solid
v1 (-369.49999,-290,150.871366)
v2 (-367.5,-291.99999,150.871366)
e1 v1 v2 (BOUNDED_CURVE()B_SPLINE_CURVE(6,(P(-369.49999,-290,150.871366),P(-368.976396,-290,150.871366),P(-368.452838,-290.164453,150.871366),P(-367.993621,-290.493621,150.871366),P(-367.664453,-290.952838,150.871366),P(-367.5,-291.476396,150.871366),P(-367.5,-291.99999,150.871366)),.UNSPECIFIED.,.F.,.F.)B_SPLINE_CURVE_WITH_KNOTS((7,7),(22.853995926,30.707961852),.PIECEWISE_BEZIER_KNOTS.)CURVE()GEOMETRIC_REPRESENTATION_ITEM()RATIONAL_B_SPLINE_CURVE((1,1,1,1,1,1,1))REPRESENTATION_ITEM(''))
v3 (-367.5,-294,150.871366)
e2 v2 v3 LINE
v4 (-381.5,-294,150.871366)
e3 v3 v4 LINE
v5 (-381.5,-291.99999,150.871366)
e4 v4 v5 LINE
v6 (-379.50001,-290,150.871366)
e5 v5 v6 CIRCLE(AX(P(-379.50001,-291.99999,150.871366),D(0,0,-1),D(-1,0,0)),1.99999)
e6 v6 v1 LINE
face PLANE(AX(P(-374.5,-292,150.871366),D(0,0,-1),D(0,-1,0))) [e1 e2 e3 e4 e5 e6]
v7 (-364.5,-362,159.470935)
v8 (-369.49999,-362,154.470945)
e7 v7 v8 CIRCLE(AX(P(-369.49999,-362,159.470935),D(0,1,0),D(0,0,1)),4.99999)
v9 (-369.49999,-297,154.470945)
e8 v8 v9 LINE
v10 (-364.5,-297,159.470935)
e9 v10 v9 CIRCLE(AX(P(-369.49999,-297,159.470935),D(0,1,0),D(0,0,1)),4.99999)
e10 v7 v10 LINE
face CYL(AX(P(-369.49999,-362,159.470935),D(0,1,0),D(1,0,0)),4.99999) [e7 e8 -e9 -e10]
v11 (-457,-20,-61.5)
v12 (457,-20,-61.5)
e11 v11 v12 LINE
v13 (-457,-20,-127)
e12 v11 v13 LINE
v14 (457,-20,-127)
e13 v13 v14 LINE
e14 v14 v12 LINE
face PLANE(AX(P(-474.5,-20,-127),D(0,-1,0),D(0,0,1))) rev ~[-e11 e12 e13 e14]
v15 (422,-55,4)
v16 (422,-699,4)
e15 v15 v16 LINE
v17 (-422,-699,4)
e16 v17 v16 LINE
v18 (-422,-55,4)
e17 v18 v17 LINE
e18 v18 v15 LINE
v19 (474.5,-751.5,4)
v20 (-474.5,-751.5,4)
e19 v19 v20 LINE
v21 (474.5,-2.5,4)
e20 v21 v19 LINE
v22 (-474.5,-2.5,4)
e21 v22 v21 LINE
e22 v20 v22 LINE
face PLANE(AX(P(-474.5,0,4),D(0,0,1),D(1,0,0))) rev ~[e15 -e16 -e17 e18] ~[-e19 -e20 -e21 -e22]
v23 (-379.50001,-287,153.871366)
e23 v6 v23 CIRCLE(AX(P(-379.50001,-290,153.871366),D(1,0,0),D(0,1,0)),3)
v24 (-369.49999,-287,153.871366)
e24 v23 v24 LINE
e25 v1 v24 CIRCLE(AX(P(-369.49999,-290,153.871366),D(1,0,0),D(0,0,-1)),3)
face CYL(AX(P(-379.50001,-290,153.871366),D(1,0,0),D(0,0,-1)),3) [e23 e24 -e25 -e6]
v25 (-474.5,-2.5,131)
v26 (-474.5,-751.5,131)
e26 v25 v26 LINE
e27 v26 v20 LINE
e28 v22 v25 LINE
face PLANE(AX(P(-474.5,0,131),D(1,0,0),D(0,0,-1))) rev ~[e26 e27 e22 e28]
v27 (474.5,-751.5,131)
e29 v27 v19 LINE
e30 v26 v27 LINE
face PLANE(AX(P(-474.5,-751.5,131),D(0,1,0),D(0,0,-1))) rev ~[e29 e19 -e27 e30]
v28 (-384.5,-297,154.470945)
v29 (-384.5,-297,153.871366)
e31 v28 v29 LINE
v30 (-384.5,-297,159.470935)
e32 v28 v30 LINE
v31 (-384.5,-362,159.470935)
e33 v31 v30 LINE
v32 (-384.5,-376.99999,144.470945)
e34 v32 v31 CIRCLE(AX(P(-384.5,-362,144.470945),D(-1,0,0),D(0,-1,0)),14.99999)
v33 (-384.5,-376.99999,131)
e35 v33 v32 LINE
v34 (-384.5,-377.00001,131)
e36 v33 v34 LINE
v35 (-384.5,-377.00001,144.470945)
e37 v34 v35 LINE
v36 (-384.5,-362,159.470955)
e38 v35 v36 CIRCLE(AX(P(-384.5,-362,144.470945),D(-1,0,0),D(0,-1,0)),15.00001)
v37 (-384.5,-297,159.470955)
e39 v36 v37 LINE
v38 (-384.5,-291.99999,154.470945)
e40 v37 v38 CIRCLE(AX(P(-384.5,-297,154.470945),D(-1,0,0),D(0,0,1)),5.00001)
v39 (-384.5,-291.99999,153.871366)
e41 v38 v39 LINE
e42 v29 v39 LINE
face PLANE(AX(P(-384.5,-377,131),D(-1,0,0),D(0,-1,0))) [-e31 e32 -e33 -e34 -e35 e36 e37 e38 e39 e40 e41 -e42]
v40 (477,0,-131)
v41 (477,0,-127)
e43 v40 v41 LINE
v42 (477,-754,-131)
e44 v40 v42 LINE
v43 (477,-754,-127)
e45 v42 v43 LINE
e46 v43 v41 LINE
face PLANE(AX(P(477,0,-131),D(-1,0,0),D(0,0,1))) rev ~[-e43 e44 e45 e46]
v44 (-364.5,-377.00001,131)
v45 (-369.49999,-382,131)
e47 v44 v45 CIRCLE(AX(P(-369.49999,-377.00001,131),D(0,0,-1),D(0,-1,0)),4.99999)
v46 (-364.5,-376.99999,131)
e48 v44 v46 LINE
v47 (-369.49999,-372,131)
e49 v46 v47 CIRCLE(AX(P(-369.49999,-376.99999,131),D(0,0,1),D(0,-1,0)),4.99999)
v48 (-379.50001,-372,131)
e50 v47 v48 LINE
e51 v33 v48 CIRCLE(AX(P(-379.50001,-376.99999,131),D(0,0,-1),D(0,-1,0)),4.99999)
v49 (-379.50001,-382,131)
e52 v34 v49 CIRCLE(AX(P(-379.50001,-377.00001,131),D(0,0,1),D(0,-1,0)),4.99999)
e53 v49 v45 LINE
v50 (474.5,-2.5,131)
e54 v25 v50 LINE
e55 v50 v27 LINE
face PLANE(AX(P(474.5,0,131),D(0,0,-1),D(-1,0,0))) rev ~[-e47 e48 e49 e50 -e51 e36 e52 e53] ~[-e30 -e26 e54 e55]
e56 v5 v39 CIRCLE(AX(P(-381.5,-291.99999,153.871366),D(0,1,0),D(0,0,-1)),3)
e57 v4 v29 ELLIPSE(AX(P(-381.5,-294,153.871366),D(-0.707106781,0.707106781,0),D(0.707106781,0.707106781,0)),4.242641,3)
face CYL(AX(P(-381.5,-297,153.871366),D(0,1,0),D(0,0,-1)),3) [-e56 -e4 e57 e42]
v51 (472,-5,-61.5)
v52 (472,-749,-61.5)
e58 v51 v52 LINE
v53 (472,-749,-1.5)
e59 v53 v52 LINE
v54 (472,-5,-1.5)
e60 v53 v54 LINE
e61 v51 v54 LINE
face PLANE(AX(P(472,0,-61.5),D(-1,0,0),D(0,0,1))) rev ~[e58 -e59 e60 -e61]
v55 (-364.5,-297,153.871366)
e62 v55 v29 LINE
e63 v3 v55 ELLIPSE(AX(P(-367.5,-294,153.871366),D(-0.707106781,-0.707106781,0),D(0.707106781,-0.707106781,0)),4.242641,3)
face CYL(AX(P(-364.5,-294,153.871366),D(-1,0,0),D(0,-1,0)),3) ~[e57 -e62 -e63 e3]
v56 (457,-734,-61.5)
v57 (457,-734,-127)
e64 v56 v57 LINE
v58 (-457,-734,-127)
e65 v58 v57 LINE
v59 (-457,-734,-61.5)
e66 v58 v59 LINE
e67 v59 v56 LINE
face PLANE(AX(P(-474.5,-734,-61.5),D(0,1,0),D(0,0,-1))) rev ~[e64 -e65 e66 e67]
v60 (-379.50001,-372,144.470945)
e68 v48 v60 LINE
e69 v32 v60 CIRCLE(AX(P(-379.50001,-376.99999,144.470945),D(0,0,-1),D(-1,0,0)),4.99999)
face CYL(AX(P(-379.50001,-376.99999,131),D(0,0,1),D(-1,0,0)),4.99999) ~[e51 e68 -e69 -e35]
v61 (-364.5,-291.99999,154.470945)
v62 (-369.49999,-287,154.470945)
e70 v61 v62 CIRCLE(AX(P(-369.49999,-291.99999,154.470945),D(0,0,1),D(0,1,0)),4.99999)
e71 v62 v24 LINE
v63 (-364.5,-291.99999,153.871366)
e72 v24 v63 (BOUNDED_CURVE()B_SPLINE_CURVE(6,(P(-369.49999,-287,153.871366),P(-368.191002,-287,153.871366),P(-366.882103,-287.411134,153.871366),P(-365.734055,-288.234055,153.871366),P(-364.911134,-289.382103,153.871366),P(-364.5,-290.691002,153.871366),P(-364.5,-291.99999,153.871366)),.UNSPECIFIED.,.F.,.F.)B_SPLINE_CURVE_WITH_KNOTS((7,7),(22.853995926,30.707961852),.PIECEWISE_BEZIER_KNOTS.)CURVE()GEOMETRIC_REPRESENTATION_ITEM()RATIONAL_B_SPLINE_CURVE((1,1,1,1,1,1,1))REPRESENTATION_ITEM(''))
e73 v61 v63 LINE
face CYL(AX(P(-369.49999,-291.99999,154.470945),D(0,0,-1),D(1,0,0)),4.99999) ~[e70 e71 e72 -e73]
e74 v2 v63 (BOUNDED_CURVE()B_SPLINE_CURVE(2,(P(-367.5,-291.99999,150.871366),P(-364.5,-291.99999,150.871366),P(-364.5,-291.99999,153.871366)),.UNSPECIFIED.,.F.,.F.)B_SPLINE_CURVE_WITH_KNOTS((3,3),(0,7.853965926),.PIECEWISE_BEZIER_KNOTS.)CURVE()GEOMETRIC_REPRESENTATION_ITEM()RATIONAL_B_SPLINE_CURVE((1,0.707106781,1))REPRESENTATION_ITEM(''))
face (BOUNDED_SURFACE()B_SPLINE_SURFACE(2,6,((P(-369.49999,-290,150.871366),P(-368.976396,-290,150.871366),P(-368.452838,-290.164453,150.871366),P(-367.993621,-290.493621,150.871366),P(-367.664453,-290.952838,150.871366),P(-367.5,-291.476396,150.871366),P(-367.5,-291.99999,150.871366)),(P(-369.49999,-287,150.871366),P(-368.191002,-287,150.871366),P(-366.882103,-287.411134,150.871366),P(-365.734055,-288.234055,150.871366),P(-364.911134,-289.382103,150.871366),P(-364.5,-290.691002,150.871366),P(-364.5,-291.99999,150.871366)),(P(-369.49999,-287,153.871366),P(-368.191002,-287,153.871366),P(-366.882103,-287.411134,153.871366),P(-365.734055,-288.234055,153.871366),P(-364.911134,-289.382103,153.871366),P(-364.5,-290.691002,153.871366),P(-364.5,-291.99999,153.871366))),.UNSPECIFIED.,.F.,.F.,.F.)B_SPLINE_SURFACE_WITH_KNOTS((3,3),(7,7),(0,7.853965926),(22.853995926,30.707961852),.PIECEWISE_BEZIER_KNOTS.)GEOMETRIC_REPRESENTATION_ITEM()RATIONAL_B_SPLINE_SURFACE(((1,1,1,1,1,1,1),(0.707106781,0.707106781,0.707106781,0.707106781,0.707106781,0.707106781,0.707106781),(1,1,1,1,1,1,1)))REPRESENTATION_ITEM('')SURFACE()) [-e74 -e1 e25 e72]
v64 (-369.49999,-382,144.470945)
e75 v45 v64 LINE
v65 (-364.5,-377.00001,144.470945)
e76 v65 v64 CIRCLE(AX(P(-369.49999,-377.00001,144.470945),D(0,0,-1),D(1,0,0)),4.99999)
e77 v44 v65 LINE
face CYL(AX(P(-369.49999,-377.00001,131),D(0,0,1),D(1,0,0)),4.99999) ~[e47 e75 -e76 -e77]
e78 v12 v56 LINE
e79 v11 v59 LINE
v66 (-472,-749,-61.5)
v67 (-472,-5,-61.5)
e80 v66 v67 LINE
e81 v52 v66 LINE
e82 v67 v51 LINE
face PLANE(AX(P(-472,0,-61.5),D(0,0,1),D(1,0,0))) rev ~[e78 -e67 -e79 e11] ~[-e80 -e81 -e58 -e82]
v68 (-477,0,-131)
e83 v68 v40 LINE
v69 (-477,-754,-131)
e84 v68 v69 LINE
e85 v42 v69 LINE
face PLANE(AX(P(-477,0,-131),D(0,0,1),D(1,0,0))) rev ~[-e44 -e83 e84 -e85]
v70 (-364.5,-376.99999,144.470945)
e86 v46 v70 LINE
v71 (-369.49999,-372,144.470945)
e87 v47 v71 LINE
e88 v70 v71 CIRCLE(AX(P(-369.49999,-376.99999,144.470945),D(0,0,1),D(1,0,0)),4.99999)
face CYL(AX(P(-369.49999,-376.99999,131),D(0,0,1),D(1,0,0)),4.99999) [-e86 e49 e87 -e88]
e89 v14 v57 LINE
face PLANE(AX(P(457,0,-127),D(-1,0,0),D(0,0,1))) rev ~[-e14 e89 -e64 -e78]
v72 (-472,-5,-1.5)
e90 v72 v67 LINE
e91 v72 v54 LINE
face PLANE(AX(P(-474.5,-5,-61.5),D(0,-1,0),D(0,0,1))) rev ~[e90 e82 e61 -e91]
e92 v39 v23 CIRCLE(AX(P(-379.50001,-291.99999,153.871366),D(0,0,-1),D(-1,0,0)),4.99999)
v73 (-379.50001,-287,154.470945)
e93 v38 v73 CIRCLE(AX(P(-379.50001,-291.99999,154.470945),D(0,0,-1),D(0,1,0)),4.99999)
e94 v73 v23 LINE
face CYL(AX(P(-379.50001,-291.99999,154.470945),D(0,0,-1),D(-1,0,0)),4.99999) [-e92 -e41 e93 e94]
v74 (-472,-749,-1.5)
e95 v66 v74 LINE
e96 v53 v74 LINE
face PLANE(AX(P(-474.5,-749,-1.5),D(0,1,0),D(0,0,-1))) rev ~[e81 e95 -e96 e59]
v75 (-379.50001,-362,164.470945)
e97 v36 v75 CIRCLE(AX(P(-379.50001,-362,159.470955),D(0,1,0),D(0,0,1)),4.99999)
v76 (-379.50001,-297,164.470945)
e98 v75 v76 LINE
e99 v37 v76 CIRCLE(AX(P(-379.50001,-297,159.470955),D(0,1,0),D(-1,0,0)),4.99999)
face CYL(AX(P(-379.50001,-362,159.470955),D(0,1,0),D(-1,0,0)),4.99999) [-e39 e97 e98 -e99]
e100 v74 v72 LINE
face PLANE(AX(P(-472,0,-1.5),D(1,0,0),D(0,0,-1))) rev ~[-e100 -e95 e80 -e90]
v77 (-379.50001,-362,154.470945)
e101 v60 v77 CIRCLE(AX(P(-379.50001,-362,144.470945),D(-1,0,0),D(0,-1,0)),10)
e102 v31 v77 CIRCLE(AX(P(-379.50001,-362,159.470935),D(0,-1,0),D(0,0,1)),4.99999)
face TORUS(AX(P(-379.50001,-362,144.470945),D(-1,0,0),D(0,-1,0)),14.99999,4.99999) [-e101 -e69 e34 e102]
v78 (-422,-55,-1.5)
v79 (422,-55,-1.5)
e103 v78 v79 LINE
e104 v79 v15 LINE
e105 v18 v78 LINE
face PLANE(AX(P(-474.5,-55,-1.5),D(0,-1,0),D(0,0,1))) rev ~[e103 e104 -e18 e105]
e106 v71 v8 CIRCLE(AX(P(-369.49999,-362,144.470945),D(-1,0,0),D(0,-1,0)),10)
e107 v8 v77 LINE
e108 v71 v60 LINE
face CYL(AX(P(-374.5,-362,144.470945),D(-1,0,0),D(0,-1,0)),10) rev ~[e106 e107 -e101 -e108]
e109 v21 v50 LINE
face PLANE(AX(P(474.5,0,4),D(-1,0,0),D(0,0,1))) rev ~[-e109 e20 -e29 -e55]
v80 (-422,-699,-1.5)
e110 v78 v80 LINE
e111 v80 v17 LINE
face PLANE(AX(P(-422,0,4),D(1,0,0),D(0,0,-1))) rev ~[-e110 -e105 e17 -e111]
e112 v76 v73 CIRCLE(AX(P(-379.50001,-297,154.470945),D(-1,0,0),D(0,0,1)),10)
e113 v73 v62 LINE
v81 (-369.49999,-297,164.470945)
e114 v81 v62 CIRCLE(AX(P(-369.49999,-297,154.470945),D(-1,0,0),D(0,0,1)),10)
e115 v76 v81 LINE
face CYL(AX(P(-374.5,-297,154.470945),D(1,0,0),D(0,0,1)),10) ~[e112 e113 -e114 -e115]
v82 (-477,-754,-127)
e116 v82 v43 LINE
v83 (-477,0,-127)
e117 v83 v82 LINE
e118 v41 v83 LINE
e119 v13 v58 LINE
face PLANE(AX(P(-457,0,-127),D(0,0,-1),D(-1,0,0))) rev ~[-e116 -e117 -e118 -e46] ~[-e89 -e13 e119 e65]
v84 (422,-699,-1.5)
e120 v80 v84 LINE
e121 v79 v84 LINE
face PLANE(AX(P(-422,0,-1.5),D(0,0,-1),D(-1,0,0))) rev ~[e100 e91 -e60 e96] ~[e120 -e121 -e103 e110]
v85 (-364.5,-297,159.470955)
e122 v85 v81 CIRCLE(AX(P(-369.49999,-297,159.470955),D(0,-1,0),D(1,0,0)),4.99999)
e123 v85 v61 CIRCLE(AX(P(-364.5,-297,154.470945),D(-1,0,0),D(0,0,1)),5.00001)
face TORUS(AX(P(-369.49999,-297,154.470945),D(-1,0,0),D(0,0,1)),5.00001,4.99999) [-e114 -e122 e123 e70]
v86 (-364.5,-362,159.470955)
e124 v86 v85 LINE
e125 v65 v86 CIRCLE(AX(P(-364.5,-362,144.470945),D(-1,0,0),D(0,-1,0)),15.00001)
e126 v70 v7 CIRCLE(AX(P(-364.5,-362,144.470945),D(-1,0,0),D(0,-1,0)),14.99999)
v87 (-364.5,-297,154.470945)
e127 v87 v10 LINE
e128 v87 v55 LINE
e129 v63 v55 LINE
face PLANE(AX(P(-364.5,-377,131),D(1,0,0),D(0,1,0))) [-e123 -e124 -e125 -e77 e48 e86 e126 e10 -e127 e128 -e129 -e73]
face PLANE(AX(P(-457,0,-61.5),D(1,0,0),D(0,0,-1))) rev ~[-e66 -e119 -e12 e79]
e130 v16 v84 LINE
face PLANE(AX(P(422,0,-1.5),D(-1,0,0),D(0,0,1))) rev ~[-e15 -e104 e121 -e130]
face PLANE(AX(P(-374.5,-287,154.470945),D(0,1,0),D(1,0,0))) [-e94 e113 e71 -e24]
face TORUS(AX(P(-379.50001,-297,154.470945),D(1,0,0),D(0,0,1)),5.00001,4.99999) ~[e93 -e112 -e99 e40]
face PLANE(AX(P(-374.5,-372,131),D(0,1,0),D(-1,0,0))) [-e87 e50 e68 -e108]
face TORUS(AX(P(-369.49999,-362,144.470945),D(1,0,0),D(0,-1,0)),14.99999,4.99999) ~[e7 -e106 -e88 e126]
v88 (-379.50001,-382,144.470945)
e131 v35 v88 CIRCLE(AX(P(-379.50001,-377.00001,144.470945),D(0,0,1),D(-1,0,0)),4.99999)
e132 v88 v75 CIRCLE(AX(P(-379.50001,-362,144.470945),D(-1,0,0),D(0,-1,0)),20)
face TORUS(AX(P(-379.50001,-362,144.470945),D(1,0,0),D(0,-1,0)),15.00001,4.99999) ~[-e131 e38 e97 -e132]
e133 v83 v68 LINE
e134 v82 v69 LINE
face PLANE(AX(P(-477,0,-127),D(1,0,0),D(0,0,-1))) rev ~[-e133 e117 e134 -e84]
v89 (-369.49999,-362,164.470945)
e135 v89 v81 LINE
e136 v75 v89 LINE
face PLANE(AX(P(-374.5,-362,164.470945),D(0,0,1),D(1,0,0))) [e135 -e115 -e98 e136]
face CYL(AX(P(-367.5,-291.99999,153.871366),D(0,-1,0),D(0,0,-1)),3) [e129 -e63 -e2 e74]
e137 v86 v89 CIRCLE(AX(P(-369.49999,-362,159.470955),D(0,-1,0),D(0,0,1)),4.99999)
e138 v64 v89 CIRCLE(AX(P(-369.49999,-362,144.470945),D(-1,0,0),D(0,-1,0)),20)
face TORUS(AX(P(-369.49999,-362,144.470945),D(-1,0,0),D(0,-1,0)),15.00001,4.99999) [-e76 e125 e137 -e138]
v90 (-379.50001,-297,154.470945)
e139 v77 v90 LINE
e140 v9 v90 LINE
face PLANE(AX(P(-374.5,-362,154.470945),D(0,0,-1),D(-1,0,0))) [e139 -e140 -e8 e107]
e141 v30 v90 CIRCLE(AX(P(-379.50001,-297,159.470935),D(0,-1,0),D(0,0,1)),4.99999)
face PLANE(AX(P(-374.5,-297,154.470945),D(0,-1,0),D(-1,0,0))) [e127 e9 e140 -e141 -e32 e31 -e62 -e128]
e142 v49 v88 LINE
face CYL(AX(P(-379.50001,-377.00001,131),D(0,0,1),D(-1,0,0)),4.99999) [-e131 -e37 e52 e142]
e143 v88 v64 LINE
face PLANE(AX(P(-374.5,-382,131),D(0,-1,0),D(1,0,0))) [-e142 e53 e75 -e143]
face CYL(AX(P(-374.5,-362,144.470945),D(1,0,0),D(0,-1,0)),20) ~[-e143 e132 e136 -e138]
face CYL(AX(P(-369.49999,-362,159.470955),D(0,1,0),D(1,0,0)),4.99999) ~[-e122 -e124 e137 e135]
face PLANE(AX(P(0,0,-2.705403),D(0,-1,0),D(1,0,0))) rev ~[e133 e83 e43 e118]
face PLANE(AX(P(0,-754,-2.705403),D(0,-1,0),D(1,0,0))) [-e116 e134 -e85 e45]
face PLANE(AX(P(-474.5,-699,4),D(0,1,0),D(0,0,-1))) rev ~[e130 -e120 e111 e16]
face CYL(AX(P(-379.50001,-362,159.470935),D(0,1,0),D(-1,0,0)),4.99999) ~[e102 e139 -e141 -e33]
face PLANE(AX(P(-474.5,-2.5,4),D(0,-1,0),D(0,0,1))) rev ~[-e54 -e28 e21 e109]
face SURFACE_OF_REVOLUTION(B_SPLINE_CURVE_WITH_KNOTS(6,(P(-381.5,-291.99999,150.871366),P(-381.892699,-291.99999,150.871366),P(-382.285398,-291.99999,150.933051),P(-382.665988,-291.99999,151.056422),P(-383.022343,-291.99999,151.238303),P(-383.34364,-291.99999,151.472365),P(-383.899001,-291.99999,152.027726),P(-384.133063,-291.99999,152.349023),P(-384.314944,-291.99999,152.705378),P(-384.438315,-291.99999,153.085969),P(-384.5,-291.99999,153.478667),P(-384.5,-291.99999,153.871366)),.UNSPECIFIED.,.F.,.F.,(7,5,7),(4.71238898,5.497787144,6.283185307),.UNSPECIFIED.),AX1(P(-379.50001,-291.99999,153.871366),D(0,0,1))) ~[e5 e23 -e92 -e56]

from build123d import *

# Parameters (mm, degrees)
F1_DEPTH = 754
F3_DEPTH = 999
F6_W     = 20
F6_H     = 10
F8_R     = 4.99999
F9_R     = 3


# Not quite as in the source:
# - a fillet or chamfer is up to 0.001 mm smaller than in the source, because OpenCascade refuses the exact size


with BuildPart() as f1:
    # F0 (on Front) → F1 (new body)
    with BuildSketch(Plane.XZ):
        Polygon((-477, -127), (-477, -131), (477, -131), (477, -127), (457, -127), (457, -61.5), (472, -61.5), (472, -1.5), (422, -1.5), (422, 4), (474.5, 4), (474.5, 131), (-474.5, 131), (-474.5, 4), (-422, 4), (-422, -1.5), (-472, -1.5), (-472, -61.5), (-457, -61.5), (-457, -127), align=None)
    extrude(amount=F1_DEPTH)

    # F2 (on face) → F3 (cut)
    with BuildSketch(Plane(origin=(-474.5, 0, 0), x_dir=(0, -1, 0), z_dir=(-1, 0, 0))):
        Polygon((754, -127), (754, -131), (765.5175328255, -131), (774.4438648224, 131), (751.5, 131), (751.5, 4), (699, 4), (699, -1.5), (749, -1.5), (749, -61.5), (734, -61.5), (734, -127), align=None)
        Polygon((55, 4), (2.5, 4), (2.5, 131), (-20.4438648224, 131), (-11.5175328255, -131), (0, -131), (0, -127), (20, -127), (20, -61.5), (5, -61.5), (5, -1.5), (55, -1.5), align=None)
    extrude(amount=-F3_DEPTH, mode=Mode.SUBTRACT)

    # F7: sweep along a path in F5
    with BuildLine(Plane(origin=(-374.5, 0, 0), x_dir=(0, -1, 0), z_dir=(-1, 0, 0))) as f7_path:
        Line((377, 131), (377, 144.4709453487))
        ThreePointArc((377, 144.4709453487), (372.6066017178, 155.0775470665), (362, 159.4709453487))
        Line((362, 159.4709453487), (297, 159.4709453487))
        ThreePointArc((297, 159.4709453487), (293.4644660941, 158.0064792547), (292, 154.4709453487))
        Line((292, 154.4709453487), (292, 150.8713660145))
    # F6 (on face) → F7 (sweep)
    with BuildSketch(Plane.XY.offset(131)):
        with Locations((-374.5, -377)):
            Rectangle(F6_W, F6_H)
    sweep(path=f7_path.line)

    # F8 (radius 5 in the source; OpenCascade refuses exactly that, so slightly less here)
    f8_edges = [f1.edges().sort_by_distance(p)[0] for p in [
        (-384.5, -329.5, 164.470945),
        (-384.5, -329.5, 154.470945),
        (-364.5, -329.5, 164.470945),
        (-364.5, -329.5, 154.470945),
    ]]
    fillet(f8_edges, radius=F8_R)

    # F9
    f9_edges = [f1.edges().sort_by_distance(p)[0] for p in [
        (-374.5, -287, 150.871366),
        (-374.5, -297, 150.871366),
        (-384.5, -294.499995, 150.871366),
    ]]
    fillet(f9_edges, radius=F9_R)


solid = f1.part
